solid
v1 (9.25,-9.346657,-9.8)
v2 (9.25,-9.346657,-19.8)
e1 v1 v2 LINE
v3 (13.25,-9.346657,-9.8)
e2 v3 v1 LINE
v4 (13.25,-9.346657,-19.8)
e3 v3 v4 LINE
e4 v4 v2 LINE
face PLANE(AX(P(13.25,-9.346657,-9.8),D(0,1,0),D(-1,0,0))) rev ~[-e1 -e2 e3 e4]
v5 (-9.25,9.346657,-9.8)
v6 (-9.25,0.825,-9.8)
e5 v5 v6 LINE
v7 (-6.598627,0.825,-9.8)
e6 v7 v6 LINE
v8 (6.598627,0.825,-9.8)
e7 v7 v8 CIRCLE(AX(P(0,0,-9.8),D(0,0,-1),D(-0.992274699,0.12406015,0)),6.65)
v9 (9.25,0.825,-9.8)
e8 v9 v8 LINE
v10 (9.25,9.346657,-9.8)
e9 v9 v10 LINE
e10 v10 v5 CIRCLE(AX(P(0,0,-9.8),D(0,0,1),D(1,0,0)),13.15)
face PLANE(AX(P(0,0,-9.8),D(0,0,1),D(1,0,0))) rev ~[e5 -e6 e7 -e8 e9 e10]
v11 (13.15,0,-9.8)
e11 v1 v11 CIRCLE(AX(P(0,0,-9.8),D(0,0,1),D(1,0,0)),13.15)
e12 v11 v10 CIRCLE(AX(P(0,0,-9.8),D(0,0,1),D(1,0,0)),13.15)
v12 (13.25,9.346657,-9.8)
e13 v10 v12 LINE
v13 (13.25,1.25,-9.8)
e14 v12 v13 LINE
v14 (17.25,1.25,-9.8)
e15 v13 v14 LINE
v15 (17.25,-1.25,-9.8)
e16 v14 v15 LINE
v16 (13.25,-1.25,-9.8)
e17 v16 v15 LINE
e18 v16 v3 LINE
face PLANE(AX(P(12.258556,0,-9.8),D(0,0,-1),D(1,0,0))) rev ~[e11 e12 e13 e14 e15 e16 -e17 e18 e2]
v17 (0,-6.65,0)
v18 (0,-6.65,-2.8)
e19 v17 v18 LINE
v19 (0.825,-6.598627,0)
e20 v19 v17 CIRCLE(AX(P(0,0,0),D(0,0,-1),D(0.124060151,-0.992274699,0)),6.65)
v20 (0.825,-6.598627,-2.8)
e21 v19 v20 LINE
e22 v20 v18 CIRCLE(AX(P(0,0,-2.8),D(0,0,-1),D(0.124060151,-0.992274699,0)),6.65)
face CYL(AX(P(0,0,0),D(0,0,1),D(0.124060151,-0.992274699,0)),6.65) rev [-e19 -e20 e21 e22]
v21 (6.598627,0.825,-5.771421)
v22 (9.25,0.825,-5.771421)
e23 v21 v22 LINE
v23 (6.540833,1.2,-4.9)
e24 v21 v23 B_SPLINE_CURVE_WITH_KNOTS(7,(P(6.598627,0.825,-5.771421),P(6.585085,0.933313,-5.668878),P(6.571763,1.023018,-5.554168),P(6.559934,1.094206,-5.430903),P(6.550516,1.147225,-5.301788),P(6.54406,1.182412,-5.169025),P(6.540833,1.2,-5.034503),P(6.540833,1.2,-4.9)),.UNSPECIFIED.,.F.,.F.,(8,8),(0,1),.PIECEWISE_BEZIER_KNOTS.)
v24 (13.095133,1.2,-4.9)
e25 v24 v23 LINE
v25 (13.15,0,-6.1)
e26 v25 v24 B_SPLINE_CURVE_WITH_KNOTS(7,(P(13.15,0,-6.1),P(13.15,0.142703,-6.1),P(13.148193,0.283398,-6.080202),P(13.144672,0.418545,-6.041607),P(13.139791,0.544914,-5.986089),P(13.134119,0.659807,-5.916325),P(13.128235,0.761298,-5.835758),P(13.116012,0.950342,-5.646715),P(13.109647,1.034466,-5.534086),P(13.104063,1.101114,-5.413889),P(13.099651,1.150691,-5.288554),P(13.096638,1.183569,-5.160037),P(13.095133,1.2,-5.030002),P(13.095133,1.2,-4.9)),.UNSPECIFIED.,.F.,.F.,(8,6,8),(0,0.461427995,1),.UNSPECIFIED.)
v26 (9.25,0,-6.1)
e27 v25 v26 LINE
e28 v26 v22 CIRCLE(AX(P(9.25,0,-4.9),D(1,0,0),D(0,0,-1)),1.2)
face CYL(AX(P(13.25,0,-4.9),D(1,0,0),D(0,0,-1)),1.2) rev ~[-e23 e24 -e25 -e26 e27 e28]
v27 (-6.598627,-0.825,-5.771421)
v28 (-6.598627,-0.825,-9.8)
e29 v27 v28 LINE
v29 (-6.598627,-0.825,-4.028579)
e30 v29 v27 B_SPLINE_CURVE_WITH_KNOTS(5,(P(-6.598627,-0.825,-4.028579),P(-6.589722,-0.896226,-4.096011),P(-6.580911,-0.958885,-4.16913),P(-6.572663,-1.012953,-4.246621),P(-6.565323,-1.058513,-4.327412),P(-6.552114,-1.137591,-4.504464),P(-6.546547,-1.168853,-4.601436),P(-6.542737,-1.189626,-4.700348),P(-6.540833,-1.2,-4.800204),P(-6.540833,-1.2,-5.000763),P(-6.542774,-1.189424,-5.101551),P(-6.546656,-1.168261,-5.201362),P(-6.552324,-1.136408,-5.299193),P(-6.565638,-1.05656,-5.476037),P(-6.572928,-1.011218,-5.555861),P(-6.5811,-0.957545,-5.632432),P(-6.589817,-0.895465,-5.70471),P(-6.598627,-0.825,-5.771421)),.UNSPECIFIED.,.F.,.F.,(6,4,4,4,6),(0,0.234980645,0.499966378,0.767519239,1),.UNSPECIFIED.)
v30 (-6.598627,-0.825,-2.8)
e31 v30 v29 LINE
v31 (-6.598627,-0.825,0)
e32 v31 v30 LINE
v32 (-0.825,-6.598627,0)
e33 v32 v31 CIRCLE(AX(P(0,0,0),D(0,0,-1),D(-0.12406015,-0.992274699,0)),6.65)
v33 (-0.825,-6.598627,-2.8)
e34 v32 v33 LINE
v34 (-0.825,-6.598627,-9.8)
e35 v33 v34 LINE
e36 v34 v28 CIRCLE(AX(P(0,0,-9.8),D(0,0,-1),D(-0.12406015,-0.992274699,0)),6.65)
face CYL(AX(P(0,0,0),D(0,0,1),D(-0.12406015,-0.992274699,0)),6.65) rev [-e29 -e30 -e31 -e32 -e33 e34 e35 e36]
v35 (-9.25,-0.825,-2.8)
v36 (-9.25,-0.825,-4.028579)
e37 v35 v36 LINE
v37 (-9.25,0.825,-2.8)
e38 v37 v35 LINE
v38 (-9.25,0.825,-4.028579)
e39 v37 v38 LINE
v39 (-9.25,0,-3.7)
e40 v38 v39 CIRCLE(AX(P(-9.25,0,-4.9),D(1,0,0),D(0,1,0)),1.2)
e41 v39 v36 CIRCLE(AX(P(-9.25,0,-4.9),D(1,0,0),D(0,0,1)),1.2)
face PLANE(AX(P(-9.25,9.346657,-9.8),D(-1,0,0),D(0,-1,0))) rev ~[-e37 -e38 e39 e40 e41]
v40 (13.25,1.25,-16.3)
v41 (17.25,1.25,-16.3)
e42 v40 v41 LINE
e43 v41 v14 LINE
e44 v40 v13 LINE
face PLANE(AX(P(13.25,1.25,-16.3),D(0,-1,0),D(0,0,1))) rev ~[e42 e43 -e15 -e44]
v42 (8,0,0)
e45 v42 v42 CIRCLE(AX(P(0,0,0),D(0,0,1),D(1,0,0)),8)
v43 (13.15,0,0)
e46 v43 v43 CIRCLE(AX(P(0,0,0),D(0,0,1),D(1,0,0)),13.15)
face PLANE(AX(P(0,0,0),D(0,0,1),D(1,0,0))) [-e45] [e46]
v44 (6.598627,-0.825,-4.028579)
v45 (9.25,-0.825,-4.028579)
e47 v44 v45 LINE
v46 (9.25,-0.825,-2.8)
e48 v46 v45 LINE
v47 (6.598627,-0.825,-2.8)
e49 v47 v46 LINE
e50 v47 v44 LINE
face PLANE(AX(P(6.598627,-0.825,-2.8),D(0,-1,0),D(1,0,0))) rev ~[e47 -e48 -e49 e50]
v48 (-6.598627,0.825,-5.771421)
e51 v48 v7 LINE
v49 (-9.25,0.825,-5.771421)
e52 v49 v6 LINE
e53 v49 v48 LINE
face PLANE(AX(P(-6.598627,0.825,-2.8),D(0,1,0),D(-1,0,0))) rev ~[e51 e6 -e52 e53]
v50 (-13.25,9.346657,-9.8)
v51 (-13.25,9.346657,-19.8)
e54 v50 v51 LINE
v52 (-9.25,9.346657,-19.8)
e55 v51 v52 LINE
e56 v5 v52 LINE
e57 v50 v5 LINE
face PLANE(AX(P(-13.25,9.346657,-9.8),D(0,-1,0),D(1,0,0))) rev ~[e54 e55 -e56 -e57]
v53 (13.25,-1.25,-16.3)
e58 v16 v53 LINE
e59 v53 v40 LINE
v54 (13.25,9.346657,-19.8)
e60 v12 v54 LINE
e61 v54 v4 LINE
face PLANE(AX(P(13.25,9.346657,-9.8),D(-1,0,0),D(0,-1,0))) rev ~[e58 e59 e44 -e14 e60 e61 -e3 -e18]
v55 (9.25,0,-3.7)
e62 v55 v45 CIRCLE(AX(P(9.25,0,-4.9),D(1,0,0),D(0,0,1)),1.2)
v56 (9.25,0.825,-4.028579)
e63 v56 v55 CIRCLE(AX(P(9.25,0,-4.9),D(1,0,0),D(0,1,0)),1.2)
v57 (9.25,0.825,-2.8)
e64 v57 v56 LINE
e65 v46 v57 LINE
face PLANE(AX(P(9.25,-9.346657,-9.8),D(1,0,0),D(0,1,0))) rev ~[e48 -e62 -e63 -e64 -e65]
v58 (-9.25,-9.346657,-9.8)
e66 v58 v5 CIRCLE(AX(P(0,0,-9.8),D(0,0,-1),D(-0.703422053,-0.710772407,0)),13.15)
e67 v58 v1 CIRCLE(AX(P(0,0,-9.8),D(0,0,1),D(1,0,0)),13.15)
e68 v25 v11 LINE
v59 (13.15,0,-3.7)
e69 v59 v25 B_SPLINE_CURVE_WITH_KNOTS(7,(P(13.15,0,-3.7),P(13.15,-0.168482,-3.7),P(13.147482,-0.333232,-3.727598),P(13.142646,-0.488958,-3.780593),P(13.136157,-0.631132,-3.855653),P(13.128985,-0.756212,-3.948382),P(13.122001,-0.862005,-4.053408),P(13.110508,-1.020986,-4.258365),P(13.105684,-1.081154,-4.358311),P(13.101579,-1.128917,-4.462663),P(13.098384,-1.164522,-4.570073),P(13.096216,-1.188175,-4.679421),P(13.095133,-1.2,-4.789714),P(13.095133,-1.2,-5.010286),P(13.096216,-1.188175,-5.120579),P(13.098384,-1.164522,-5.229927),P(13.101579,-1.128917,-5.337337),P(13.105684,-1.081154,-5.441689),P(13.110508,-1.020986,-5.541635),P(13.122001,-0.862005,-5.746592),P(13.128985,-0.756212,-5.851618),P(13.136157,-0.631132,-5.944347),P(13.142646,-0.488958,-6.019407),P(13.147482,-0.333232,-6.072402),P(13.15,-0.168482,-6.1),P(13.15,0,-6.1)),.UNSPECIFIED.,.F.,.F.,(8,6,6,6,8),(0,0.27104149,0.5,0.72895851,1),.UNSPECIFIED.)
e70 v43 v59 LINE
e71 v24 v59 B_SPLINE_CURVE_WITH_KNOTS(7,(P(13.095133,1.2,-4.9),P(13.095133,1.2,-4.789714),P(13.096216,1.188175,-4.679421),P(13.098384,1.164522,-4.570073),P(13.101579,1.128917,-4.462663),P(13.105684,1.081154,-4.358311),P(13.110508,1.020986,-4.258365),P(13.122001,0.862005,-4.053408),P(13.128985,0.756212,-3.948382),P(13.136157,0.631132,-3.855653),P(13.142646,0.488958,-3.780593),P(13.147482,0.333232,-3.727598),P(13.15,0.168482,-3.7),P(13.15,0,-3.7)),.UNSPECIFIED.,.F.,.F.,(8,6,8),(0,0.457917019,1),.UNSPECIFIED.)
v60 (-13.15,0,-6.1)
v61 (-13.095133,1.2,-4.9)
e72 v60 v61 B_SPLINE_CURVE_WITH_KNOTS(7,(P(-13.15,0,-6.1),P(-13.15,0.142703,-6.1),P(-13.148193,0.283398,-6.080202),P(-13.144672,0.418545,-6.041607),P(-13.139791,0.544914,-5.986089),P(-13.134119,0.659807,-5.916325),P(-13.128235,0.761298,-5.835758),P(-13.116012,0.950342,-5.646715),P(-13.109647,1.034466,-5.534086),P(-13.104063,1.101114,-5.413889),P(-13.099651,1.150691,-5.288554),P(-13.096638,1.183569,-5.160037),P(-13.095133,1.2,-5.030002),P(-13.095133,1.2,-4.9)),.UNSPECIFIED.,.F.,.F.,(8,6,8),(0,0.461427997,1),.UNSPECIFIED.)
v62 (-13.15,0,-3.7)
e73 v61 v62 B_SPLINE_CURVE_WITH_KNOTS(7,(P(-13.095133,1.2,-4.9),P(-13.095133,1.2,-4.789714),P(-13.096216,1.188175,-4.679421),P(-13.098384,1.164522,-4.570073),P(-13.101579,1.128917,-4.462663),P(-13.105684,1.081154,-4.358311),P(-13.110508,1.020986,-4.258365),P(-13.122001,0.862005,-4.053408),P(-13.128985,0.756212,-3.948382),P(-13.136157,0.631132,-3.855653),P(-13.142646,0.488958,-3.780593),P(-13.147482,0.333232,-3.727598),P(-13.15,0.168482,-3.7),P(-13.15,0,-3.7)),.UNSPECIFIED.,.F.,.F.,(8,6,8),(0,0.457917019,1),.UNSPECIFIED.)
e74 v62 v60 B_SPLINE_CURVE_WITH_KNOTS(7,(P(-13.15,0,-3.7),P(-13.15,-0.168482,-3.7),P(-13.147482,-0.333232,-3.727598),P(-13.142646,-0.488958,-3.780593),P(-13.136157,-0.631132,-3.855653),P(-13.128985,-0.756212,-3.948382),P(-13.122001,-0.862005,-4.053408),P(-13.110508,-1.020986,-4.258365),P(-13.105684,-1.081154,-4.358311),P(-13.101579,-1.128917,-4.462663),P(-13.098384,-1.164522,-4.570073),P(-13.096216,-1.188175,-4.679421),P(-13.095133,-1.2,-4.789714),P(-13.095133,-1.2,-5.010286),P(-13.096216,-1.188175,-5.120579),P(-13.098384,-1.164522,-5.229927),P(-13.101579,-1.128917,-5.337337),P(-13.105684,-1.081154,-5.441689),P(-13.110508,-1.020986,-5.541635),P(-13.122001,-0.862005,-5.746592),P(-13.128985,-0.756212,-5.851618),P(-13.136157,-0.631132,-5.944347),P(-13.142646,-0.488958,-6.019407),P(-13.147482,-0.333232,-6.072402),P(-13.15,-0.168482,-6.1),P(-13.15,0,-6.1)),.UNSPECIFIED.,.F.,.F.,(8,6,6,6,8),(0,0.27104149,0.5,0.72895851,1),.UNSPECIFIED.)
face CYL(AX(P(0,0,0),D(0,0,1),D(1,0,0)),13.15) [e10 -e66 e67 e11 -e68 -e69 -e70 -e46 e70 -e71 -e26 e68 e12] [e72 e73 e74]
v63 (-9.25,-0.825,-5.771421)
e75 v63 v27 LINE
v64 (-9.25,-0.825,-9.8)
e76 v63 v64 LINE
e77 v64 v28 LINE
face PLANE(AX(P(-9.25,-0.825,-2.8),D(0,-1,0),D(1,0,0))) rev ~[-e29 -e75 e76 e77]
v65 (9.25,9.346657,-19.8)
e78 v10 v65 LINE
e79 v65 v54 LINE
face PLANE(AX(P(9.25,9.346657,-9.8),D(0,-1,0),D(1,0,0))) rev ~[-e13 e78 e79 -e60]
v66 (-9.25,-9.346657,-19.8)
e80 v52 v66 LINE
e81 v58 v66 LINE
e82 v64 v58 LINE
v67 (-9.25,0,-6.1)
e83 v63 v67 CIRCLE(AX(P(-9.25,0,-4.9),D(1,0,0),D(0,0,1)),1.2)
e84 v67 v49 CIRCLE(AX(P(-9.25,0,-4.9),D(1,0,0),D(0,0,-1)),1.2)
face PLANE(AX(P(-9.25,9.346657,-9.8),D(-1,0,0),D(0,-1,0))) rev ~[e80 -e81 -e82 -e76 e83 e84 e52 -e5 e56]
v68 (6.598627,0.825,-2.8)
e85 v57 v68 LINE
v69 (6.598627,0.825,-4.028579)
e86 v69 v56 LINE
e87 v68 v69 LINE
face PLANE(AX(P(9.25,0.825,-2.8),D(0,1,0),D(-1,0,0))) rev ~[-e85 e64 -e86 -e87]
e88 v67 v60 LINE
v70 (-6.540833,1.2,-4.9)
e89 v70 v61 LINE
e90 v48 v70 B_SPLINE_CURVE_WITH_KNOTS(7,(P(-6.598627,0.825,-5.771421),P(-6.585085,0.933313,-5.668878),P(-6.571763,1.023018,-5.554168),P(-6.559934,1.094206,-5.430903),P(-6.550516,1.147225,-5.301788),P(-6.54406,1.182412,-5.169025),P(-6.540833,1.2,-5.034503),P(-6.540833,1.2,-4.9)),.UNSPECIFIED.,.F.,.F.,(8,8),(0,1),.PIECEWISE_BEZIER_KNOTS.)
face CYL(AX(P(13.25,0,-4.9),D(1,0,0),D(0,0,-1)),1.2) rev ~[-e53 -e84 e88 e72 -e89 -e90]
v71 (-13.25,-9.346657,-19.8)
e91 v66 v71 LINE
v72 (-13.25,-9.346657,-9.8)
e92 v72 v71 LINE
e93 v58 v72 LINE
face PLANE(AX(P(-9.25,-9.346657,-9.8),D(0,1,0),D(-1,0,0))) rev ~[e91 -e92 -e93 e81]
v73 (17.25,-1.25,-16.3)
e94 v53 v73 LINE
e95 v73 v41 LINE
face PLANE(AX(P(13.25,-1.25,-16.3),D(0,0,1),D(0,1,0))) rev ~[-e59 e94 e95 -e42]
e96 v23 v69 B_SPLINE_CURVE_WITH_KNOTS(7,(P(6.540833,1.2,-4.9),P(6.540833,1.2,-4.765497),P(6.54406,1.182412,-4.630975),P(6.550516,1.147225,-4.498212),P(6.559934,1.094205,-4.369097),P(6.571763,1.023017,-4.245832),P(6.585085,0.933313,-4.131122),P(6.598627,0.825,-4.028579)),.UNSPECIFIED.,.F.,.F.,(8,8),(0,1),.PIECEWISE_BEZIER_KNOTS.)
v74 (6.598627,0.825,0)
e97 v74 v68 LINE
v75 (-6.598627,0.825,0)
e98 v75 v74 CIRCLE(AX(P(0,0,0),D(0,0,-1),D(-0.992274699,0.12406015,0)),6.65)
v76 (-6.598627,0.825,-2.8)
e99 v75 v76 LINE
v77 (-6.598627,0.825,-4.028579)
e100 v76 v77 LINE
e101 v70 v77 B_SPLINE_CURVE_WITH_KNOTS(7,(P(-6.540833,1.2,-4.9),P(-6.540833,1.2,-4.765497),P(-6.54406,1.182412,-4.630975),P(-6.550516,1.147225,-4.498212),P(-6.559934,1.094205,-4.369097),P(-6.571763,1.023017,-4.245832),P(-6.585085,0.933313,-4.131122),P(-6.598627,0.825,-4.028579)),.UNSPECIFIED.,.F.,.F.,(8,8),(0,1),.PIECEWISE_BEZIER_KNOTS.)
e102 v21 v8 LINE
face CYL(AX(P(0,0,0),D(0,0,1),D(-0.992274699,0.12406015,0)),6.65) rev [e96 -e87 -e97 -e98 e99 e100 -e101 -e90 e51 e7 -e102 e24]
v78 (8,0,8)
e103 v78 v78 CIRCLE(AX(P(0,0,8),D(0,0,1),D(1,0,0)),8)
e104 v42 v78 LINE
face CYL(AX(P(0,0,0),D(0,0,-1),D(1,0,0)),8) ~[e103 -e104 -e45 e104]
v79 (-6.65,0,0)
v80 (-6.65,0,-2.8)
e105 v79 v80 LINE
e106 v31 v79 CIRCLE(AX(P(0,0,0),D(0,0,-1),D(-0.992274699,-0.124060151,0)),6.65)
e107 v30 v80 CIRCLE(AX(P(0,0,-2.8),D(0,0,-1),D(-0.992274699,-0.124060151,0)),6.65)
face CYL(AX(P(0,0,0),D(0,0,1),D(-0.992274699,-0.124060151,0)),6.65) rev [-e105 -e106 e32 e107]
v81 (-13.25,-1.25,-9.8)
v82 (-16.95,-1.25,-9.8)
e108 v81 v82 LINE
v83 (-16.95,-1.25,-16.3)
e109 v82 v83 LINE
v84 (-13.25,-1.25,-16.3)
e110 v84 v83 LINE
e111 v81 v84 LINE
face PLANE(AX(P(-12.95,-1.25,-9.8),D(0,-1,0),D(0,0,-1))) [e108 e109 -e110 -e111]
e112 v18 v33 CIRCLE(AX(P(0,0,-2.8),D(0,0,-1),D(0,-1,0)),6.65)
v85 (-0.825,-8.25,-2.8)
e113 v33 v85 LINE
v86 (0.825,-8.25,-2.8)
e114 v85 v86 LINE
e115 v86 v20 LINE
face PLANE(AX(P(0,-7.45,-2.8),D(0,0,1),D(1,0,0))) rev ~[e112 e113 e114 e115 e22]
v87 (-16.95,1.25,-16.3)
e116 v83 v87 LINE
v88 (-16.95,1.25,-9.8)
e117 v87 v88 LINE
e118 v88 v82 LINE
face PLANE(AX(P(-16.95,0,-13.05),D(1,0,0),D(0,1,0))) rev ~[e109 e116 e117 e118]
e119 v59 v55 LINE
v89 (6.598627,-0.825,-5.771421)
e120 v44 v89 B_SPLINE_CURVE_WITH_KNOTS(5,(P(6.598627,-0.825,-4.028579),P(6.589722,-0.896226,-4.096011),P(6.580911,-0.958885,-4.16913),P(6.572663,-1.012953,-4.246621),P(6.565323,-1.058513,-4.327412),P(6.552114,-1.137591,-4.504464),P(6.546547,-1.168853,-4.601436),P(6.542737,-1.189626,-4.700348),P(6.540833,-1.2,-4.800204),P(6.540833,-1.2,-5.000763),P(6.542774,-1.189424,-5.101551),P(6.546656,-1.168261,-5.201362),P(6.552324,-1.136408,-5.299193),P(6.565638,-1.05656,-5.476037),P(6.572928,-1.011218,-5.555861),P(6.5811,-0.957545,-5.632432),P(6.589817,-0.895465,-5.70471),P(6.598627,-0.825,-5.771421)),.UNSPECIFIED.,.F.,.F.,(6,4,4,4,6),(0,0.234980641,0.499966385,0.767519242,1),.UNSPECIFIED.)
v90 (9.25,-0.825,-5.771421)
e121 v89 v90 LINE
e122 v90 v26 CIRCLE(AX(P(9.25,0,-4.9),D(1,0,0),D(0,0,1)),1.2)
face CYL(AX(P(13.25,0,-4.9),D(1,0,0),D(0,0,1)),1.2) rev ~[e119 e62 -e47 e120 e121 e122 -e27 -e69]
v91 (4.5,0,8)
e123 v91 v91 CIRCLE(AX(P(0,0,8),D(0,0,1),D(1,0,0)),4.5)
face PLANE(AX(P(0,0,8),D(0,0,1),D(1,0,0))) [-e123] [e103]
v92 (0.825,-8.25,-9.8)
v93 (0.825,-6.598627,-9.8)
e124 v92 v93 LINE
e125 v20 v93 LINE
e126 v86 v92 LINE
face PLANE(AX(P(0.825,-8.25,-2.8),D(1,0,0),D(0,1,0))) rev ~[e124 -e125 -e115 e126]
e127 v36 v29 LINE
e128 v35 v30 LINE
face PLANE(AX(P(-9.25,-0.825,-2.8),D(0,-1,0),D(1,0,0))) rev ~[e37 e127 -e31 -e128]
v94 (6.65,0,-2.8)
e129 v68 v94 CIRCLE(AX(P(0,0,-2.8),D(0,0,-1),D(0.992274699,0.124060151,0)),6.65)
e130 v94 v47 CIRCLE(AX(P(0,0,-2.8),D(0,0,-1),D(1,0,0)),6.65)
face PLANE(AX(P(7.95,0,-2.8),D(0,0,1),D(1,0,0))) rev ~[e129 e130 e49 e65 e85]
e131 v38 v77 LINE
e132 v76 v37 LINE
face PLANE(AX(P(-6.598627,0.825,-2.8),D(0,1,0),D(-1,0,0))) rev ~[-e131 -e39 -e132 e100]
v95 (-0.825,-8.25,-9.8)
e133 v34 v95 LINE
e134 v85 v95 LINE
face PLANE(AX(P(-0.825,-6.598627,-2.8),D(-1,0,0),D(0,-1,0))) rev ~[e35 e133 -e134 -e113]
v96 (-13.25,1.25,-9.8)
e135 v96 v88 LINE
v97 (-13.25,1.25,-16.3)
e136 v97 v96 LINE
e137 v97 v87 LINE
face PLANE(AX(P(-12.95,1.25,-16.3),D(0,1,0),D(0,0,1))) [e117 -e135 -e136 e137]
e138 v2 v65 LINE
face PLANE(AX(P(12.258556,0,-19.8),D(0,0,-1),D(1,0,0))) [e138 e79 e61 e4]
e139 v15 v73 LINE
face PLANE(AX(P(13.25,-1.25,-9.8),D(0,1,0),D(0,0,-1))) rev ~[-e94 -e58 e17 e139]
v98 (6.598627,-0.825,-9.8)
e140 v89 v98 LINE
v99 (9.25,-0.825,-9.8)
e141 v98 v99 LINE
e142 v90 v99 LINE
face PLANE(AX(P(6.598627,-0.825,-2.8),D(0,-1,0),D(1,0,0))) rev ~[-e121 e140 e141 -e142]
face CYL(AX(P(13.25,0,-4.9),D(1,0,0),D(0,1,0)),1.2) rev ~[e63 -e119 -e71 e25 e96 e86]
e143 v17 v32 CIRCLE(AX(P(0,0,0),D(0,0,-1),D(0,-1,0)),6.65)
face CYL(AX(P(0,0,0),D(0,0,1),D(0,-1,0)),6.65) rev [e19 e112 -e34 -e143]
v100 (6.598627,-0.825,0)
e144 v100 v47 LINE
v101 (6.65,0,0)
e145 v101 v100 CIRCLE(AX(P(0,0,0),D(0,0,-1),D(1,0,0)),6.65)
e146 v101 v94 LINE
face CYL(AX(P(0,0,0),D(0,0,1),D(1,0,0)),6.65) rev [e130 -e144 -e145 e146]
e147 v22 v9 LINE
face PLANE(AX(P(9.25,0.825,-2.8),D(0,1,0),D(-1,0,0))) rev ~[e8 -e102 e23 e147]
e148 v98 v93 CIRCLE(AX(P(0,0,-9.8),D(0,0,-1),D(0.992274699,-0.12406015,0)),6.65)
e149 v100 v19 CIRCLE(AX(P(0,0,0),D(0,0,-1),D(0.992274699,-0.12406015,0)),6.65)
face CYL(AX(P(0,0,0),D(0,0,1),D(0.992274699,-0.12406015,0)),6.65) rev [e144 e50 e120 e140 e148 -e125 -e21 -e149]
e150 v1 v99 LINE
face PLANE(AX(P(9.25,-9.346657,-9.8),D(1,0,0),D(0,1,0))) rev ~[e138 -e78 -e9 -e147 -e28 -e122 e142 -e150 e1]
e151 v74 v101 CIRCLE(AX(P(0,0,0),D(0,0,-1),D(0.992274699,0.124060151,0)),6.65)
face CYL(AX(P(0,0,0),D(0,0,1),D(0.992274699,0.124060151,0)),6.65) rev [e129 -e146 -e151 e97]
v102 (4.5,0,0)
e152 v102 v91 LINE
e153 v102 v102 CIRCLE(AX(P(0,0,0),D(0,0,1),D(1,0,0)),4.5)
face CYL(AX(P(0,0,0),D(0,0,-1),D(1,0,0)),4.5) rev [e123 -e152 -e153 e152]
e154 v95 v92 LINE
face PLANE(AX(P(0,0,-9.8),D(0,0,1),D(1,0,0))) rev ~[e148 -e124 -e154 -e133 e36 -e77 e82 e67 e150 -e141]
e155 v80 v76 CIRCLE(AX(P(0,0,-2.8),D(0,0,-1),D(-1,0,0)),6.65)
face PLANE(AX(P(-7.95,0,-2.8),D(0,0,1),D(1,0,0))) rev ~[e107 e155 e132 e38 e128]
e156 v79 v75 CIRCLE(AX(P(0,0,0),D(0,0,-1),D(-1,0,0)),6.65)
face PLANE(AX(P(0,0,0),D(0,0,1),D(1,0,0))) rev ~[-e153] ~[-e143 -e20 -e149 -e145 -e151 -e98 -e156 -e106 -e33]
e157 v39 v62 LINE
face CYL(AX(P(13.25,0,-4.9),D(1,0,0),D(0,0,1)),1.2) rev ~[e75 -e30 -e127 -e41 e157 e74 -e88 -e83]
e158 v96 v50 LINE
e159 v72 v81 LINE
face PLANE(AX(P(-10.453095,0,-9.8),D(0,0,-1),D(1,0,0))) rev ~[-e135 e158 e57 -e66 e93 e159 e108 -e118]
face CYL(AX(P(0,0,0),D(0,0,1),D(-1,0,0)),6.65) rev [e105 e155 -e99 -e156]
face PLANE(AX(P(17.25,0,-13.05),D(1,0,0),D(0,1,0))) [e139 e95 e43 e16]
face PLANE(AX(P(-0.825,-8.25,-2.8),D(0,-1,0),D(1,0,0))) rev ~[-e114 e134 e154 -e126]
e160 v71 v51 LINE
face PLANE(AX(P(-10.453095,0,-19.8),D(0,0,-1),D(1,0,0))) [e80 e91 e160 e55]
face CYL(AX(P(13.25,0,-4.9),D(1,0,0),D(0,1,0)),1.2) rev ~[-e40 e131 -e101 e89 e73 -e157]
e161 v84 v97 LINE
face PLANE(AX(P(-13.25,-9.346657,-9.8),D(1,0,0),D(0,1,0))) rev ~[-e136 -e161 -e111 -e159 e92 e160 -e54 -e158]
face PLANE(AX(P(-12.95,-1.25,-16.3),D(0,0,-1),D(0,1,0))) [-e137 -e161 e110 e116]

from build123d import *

# Parameters (mm, degrees)
F0_R      = 8
F0_R_2    = 4.5
F1_DEPTH  = 8
F2_R      = 13.15
F3_DEPTH  = 9.8
F4_START  = -2.8
F4_DEPTH  = 22.2
F6_DEPTH  = 10
F8_START  = -26.2
F8_DEPTH  = 4
F9_DEPTH  = 4
F10_DEPTH = 76


with BuildPart() as f1:
    # F0 (on Top) → F1 (new body)
    with BuildSketch(Plane.XY):
        Circle(F0_R)
        Circle(F0_R_2, mode=Mode.SUBTRACT)
    extrude(amount=F1_DEPTH)

    # F2 (on Top) → F3 (join)
    with BuildSketch(Plane.XY):
        Circle(F2_R)
        with BuildLine():
            ThreePointArc((-6.5986267511, 0.825), (0, 6.65), (6.5986267511, 0.825))
            Line((6.5986267511, 0.825), (6.65, 0.825))
            Line((6.65, 0.825), (9.25, 0.825))
            Line((9.25, 0.825), (9.25, -0.825))
            Line((9.25, -0.825), (6.65, -0.825))
            Line((6.65, -0.825), (6.5986267511, -0.825))
            ThreePointArc((6.5986267511, -0.825), (4.7022600949, -4.7022600949), (0.825, -6.5986267511))
            Line((0.825, -6.5986267511), (0.825, -6.65))
            Line((0.825, -6.65), (0.825, -8.25))
            Line((0.825, -8.25), (-0.825, -8.25))
            Line((-0.825, -8.25), (-0.825, -6.65))
            Line((-0.825, -6.65), (-0.825, -6.5986267511))
            ThreePointArc((-0.825, -6.5986267511), (-4.7022600949, -4.7022600949), (-6.5986267511, -0.825))
            Line((-6.5986267511, -0.825), (-6.65, -0.825))
            Line((-6.65, -0.825), (-9.25, -0.825))
            Line((-9.25, -0.825), (-9.25, 0.825))
            Line((-9.25, 0.825), (-6.65, 0.825))
            Line((-6.65, 0.825), (-6.5986267511, 0.825))
        make_face(mode=Mode.SUBTRACT)
        Polygon((-6.65, -0.825), (-6.65, 0), (-6.65, 0.825), (-9.25, 0.825), (-9.25, -0.825), align=None)
        Polygon((6.65, 0.825), (6.65, 0), (6.65, -0.825), (9.25, -0.825), (9.25, 0.825), align=None)
        Polygon((0.825, -6.65), (0, -6.65), (-0.825, -6.65), (-0.825, -8.25), (0.825, -8.25), align=None)
        with BuildLine():
            Line((0.825, -6.65), (0.825, -6.5986267511))
            ThreePointArc((0.825, -6.5986267511), (0.413298987, -6.6371442615), (0, -6.65))
            Line((0, -6.65), (0.825, -6.65))
        make_face()
        with BuildLine():
            Line((-0.825, -6.65), (0, -6.65))
            ThreePointArc((0, -6.65), (-0.413298987, -6.6371442615), (-0.825, -6.5986267511))
            Line((-0.825, -6.5986267511), (-0.825, -6.65))
        make_face()
        with BuildLine():
            ThreePointArc((6.5986267511, 0.825), (6.6371442615, 0.413298987), (6.65, 0))
            Line((6.65, 0), (6.65, 0.825))
            Line((6.65, 0.825), (6.5986267511, 0.825))
        make_face()
        with BuildLine():
            Line((6.65, -0.825), (6.65, 0))
            ThreePointArc((6.65, 0), (6.6371442615, -0.413298987), (6.5986267511, -0.825))
            Line((6.5986267511, -0.825), (6.65, -0.825))
        make_face()
        with BuildLine():
            ThreePointArc((-6.5986267511, -0.825), (-6.6371442615, -0.413298987), (-6.65, 0))
            Line((-6.65, 0), (-6.65, -0.825))
            Line((-6.65, -0.825), (-6.5986267511, -0.825))
        make_face()
        with BuildLine():
            ThreePointArc((-6.65, 0), (-6.6371442615, 0.413298987), (-6.5986267511, 0.825))
            Line((-6.5986267511, 0.825), (-6.65, 0.825))
            Line((-6.65, 0.825), (-6.65, 0))
        make_face()
    extrude(amount=-F3_DEPTH)

    # F2 (on Top) → F4 (cut)
    with BuildSketch(Plane.XY.offset(F4_START)):
        Polygon((6.65, 0.825), (6.65, 0), (6.65, -0.825), (9.25, -0.825), (9.25, 0.825), align=None)
        Polygon((0.825, -6.65), (0, -6.65), (-0.825, -6.65), (-0.825, -8.25), (0.825, -8.25), align=None)
        Polygon((-6.65, -0.825), (-6.65, 0), (-6.65, 0.825), (-9.25, 0.825), (-9.25, -0.825), align=None)
        with BuildLine():
            Line((6.65, -0.825), (6.65, 0))
            ThreePointArc((6.65, 0), (6.6371442615, -0.413298987), (6.5986267511, -0.825))
            Line((6.5986267511, -0.825), (6.65, -0.825))
        make_face()
        with BuildLine():
            ThreePointArc((6.5986267511, 0.825), (6.6371442615, 0.413298987), (6.65, 0))
            Line((6.65, 0), (6.65, 0.825))
            Line((6.65, 0.825), (6.5986267511, 0.825))
        make_face()
        with BuildLine():
            Line((-0.825, -6.65), (0, -6.65))
            ThreePointArc((0, -6.65), (-0.413298987, -6.6371442615), (-0.825, -6.5986267511))
            Line((-0.825, -6.5986267511), (-0.825, -6.65))
        make_face()
        with BuildLine():
            Line((0.825, -6.65), (0.825, -6.5986267511))
            ThreePointArc((0.825, -6.5986267511), (0.413298987, -6.6371442615), (0, -6.65))
            Line((0, -6.65), (0.825, -6.65))
        make_face()
        with BuildLine():
            ThreePointArc((-6.65, 0), (-6.6371442615, 0.413298987), (-6.5986267511, 0.825))
            Line((-6.5986267511, 0.825), (-6.65, 0.825))
            Line((-6.65, 0.825), (-6.65, 0))
        make_face()
        with BuildLine():
            ThreePointArc((-6.5986267511, -0.825), (-6.6371442615, -0.413298987), (-6.65, 0))
            Line((-6.65, 0), (-6.65, -0.825))
            Line((-6.65, -0.825), (-6.5986267511, -0.825))
        make_face()
    extrude(amount=-F4_DEPTH, mode=Mode.SUBTRACT)

    # F5 (on face) → F6 (join)
    with BuildSketch(Plane(origin=(0, 0, -9.8), x_dir=(1, 0, 0), z_dir=(0, 0, -1))):
        with BuildLine():
            ThreePointArc((13.15, 0), (12.135897165, -5.0638424146), (9.25, -9.3466571564))
            Line((9.25, -9.3466571564), (13.25, -9.3466571564))
            Line((13.25, -9.3466571564), (13.25, 9.3466571564))
            Line((13.25, 9.3466571564), (9.25, 9.3466571564))
            ThreePointArc((9.25, 9.3466571564), (12.135897165, 5.0638424146), (13.15, 0))
        make_face()
        with BuildLine():
            Line((9.25, -0.825), (9.25, -9.3466571564))
            ThreePointArc((9.25, -9.3466571564), (12.135897165, -5.0638424146), (13.15, 0))
            ThreePointArc((13.15, 0), (12.135897165, 5.0638424146), (9.25, 9.3466571564))
            Line((9.25, 9.3466571564), (9.25, 0.825))
            Line((9.25, 0.825), (9.25, -0.825))
        make_face()
        with BuildLine():
            ThreePointArc((-9.25, 9.3466571564), (-13.15, 0), (-9.25, -9.3466571564))
            Line((-9.25, -9.3466571564), (-9.25, -0.825))
            Line((-9.25, -0.825), (-9.25, 0.825))
            Line((-9.25, 0.825), (-9.25, 9.3466571564))
        make_face()
        with BuildLine():
            Line((-13.25, -9.3466571564), (-9.25, -9.3466571564))
            ThreePointArc((-9.25, -9.3466571564), (-13.15, 0), (-9.25, 9.3466571564))
            Line((-9.25, 9.3466571564), (-13.25, 9.3466571564))
            Line((-13.25, 9.3466571564), (-13.25, -9.3466571564))
        make_face()
    extrude(amount=F6_DEPTH)

    # F7 (on face) → F8 (join)
    with BuildSketch(Plane.YZ.offset(13.25).offset(F8_START)):
        Polygon((0, -9.8), (-1.25, -9.8), (-1.25, -16.3), (1.25, -16.3), (1.25, -9.8), align=None)
    extrude(amount=-F8_DEPTH)

    # F7 (on face) → F9 (join)
    with BuildSketch(Plane.YZ.offset(13.25)):
        Polygon((0, -9.8), (-1.25, -9.8), (-1.25, -16.3), (1.25, -16.3), (1.25, -9.8), align=None)
    extrude(amount=F9_DEPTH)

    # F7 (on face) → F10 (cut)
    with BuildSketch(Plane.YZ.offset(13.25)):
        with BuildLine():
            ThreePointArc((0, -3.7), (-1.2, -4.9), (0, -6.1))
            Line((0, -6.1), (0, -3.7))
        make_face()
        with BuildLine():
            Line((0, -3.7), (0, -6.1))
            ThreePointArc((0, -6.1), (0.8485281374, -5.7485281374), (1.2, -4.9))
            ThreePointArc((1.2, -4.9), (0.8485281374, -4.0514718626), (0, -3.7))
        make_face()
    extrude(amount=-F10_DEPTH, mode=Mode.SUBTRACT)


solid = f1.part
